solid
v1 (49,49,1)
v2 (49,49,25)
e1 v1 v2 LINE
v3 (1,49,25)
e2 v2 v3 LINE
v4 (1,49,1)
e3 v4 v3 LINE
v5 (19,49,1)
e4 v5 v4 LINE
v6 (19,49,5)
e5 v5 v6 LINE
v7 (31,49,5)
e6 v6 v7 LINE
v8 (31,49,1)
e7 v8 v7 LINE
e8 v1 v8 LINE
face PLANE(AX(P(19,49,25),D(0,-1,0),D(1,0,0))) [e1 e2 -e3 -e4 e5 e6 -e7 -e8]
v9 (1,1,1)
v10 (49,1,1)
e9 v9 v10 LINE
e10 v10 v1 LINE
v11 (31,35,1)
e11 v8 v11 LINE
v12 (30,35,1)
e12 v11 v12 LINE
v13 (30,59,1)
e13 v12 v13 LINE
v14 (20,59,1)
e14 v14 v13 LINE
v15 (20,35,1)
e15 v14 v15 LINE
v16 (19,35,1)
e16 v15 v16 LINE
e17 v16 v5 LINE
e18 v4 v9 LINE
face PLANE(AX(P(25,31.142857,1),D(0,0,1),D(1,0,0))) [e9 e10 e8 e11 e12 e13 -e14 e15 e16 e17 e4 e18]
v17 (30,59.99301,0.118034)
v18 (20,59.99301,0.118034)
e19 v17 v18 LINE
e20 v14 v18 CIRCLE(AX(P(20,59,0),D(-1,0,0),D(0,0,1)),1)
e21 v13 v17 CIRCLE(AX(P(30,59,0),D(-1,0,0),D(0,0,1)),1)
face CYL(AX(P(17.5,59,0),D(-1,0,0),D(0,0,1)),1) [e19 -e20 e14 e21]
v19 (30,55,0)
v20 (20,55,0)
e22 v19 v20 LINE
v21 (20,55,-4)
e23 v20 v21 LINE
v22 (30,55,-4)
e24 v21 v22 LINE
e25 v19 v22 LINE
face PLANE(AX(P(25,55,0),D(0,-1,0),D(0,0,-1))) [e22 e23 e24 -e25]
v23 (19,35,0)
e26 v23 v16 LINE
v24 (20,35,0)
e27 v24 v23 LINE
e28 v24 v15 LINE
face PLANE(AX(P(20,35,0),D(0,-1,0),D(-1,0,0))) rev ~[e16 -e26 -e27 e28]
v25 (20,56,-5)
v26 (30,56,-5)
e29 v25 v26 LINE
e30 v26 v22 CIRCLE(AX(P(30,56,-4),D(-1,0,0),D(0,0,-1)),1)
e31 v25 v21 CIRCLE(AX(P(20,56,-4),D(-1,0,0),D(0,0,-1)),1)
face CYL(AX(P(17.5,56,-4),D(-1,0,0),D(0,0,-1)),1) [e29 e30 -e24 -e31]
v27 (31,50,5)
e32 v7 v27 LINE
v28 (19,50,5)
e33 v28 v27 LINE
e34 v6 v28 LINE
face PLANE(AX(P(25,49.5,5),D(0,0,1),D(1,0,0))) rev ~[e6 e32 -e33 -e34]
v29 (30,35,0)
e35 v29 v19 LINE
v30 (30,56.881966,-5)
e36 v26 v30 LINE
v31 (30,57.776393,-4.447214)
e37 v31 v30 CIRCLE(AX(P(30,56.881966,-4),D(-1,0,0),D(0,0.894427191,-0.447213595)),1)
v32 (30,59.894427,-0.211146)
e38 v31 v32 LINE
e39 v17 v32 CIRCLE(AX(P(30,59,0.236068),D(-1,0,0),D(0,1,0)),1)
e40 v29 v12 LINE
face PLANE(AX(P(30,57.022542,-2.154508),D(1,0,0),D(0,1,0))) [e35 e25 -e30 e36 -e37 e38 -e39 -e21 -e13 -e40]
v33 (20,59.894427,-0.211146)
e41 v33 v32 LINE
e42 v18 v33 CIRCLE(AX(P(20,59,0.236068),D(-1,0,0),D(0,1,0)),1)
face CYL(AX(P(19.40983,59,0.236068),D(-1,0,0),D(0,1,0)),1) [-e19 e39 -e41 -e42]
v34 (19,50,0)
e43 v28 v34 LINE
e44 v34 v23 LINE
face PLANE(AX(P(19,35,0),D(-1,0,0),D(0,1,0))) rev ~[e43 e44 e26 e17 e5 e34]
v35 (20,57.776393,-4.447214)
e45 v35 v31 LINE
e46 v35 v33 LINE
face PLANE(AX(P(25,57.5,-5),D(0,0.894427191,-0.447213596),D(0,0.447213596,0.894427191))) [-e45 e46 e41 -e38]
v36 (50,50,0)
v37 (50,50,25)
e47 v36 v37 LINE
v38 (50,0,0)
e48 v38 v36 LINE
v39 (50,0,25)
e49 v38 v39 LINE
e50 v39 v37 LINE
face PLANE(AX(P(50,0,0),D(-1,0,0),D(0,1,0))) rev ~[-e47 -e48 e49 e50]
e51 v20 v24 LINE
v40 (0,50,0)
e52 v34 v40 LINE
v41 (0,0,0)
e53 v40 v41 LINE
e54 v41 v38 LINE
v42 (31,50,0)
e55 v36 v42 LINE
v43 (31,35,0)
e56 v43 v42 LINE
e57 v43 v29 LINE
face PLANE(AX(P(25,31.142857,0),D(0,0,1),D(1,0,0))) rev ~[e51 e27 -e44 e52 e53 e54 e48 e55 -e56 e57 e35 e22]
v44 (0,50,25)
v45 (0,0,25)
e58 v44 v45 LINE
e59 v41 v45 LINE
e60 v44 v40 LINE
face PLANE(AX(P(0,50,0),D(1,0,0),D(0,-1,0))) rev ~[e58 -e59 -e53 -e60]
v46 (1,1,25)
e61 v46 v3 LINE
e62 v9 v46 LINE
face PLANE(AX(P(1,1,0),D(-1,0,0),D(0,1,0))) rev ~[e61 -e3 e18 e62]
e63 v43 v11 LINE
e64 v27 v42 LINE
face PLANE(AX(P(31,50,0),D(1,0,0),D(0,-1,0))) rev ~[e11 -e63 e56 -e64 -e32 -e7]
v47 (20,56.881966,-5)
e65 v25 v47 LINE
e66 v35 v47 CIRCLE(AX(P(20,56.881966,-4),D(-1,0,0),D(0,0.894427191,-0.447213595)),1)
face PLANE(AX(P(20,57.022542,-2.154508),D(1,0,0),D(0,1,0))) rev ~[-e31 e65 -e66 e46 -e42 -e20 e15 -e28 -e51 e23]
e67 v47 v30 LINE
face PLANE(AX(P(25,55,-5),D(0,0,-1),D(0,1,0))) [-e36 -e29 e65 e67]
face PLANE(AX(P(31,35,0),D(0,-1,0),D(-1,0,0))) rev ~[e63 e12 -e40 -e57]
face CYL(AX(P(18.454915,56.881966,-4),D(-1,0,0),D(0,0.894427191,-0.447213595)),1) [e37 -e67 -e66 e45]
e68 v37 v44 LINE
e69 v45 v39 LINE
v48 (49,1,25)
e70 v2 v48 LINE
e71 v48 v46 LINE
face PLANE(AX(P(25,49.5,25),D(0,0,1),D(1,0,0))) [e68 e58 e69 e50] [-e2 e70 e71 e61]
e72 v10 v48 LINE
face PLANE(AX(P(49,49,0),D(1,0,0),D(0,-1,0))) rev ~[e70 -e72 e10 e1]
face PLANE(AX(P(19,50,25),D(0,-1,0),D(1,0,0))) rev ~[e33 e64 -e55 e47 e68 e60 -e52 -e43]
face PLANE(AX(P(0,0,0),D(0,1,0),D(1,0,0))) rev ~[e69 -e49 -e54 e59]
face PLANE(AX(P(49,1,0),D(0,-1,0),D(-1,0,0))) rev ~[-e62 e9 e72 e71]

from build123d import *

# Parameters (mm, degrees)
F1_DEPTH      = 1
F3_DEPTH      = 25
F6_DEPTH      = 5
F6_DEPTH_BACK = 5
F8_W          = 12
F8_H          = 1
F9_DEPTH      = 20
F10_T1_DEPTH  = 13.0901699437
F10_T3_DEPTH  = 15
F10_T5_DEPTH  = 11.1803398875


# Not quite as in the source:
# - a fillet or chamfer that OpenCascade refuses, or shapes differently, is made with other operations: its cross-section is extruded or revolved along the edge and cut away or added


with BuildPart() as f1:
    # F0 (on Top) → F1 (new body)
    with BuildSketch(Plane.XY):
        Polygon((0, 50), (0, 0), (50, 0), (50, 50), (31, 50), (31, 35), (30, 35), (30, 60), (20, 60), (20, 35), (19, 35), (19, 50), align=None)
    extrude(amount=F1_DEPTH)

    # F2 (on Top) → F3 (join)
    with BuildSketch(Plane.XY):
        Polygon((0, 50), (0, 0), (50, 0), (50, 50), (31, 50), (31, 49), (49, 49), (49, 1), (1, 1), (1, 49), (19, 49), (19, 50), align=None)
    extrude(amount=F3_DEPTH)

    # F5 (on offset) → F6 (join, two sides)
    with BuildSketch(Plane.YZ.offset(25)) as f6_sk:
        Polygon((57.5, -5), (60, 0), (55, 0), (55, -5), align=None)
    extrude(amount=F6_DEPTH)
    extrude(f6_sk.sketch, amount=-F6_DEPTH_BACK)

    # F8 (on offset) → F9 (join)
    with BuildSketch(Plane.XY.offset(25)):
        with Locations((25, 49.5)):
            Rectangle(F8_W, F8_H)
    extrude(amount=-F9_DEPTH)

    # F10: fillet of radius 1 on 4 edges, made by hand

    # F10_s2 → F10_t1 (cut)
    with BuildSketch(Plane.YZ.offset(18.4549150281)):
        with BuildLine():
            ThreePointArc((57.7763932023, -4.4472135955), (57.4076971234, -4.8506508084), (56.8819660113, -5))
            Line((56.8819660113, -5), (57.5, -5))
            Line((57.5, -5), (57.7763932023, -4.4472135955))
        make_face()
    extrude(amount=F10_T1_DEPTH, mode=Mode.SUBTRACT)

    # F10_s4 → F10_t3 (cut)
    with BuildSketch(Plane.YZ.offset(17.5)):
        with BuildLine():
            ThreePointArc((56, -5), (55.2928932188, -4.7071067812), (55, -4))
            Line((55, -4), (55, -5))
            Line((55, -5), (56, -5))
        make_face()
        with BuildLine():
            ThreePointArc((59, 1), (59.7071067812, 0.7071067812), (60, 0))
            Line((60, 0), (60, 1))
            Line((60, 1), (59, 1))
        make_face()
    extrude(amount=F10_T3_DEPTH, mode=Mode.SUBTRACT)

    # F10_s6 → F10_t5 (cut)
    with BuildSketch(Plane.YZ.offset(19.4098300563)):
        with BuildLine():
            ThreePointArc((60, 0.2360679775), (59.9732489895, 0.006315057), (59.894427191, -0.211145618))
            Line((59.894427191, -0.211145618), (60, 0))
            Line((60, 0), (60, 0.2360679775))
        make_face()
    extrude(amount=F10_T5_DEPTH, mode=Mode.SUBTRACT)


solid = f1.part
